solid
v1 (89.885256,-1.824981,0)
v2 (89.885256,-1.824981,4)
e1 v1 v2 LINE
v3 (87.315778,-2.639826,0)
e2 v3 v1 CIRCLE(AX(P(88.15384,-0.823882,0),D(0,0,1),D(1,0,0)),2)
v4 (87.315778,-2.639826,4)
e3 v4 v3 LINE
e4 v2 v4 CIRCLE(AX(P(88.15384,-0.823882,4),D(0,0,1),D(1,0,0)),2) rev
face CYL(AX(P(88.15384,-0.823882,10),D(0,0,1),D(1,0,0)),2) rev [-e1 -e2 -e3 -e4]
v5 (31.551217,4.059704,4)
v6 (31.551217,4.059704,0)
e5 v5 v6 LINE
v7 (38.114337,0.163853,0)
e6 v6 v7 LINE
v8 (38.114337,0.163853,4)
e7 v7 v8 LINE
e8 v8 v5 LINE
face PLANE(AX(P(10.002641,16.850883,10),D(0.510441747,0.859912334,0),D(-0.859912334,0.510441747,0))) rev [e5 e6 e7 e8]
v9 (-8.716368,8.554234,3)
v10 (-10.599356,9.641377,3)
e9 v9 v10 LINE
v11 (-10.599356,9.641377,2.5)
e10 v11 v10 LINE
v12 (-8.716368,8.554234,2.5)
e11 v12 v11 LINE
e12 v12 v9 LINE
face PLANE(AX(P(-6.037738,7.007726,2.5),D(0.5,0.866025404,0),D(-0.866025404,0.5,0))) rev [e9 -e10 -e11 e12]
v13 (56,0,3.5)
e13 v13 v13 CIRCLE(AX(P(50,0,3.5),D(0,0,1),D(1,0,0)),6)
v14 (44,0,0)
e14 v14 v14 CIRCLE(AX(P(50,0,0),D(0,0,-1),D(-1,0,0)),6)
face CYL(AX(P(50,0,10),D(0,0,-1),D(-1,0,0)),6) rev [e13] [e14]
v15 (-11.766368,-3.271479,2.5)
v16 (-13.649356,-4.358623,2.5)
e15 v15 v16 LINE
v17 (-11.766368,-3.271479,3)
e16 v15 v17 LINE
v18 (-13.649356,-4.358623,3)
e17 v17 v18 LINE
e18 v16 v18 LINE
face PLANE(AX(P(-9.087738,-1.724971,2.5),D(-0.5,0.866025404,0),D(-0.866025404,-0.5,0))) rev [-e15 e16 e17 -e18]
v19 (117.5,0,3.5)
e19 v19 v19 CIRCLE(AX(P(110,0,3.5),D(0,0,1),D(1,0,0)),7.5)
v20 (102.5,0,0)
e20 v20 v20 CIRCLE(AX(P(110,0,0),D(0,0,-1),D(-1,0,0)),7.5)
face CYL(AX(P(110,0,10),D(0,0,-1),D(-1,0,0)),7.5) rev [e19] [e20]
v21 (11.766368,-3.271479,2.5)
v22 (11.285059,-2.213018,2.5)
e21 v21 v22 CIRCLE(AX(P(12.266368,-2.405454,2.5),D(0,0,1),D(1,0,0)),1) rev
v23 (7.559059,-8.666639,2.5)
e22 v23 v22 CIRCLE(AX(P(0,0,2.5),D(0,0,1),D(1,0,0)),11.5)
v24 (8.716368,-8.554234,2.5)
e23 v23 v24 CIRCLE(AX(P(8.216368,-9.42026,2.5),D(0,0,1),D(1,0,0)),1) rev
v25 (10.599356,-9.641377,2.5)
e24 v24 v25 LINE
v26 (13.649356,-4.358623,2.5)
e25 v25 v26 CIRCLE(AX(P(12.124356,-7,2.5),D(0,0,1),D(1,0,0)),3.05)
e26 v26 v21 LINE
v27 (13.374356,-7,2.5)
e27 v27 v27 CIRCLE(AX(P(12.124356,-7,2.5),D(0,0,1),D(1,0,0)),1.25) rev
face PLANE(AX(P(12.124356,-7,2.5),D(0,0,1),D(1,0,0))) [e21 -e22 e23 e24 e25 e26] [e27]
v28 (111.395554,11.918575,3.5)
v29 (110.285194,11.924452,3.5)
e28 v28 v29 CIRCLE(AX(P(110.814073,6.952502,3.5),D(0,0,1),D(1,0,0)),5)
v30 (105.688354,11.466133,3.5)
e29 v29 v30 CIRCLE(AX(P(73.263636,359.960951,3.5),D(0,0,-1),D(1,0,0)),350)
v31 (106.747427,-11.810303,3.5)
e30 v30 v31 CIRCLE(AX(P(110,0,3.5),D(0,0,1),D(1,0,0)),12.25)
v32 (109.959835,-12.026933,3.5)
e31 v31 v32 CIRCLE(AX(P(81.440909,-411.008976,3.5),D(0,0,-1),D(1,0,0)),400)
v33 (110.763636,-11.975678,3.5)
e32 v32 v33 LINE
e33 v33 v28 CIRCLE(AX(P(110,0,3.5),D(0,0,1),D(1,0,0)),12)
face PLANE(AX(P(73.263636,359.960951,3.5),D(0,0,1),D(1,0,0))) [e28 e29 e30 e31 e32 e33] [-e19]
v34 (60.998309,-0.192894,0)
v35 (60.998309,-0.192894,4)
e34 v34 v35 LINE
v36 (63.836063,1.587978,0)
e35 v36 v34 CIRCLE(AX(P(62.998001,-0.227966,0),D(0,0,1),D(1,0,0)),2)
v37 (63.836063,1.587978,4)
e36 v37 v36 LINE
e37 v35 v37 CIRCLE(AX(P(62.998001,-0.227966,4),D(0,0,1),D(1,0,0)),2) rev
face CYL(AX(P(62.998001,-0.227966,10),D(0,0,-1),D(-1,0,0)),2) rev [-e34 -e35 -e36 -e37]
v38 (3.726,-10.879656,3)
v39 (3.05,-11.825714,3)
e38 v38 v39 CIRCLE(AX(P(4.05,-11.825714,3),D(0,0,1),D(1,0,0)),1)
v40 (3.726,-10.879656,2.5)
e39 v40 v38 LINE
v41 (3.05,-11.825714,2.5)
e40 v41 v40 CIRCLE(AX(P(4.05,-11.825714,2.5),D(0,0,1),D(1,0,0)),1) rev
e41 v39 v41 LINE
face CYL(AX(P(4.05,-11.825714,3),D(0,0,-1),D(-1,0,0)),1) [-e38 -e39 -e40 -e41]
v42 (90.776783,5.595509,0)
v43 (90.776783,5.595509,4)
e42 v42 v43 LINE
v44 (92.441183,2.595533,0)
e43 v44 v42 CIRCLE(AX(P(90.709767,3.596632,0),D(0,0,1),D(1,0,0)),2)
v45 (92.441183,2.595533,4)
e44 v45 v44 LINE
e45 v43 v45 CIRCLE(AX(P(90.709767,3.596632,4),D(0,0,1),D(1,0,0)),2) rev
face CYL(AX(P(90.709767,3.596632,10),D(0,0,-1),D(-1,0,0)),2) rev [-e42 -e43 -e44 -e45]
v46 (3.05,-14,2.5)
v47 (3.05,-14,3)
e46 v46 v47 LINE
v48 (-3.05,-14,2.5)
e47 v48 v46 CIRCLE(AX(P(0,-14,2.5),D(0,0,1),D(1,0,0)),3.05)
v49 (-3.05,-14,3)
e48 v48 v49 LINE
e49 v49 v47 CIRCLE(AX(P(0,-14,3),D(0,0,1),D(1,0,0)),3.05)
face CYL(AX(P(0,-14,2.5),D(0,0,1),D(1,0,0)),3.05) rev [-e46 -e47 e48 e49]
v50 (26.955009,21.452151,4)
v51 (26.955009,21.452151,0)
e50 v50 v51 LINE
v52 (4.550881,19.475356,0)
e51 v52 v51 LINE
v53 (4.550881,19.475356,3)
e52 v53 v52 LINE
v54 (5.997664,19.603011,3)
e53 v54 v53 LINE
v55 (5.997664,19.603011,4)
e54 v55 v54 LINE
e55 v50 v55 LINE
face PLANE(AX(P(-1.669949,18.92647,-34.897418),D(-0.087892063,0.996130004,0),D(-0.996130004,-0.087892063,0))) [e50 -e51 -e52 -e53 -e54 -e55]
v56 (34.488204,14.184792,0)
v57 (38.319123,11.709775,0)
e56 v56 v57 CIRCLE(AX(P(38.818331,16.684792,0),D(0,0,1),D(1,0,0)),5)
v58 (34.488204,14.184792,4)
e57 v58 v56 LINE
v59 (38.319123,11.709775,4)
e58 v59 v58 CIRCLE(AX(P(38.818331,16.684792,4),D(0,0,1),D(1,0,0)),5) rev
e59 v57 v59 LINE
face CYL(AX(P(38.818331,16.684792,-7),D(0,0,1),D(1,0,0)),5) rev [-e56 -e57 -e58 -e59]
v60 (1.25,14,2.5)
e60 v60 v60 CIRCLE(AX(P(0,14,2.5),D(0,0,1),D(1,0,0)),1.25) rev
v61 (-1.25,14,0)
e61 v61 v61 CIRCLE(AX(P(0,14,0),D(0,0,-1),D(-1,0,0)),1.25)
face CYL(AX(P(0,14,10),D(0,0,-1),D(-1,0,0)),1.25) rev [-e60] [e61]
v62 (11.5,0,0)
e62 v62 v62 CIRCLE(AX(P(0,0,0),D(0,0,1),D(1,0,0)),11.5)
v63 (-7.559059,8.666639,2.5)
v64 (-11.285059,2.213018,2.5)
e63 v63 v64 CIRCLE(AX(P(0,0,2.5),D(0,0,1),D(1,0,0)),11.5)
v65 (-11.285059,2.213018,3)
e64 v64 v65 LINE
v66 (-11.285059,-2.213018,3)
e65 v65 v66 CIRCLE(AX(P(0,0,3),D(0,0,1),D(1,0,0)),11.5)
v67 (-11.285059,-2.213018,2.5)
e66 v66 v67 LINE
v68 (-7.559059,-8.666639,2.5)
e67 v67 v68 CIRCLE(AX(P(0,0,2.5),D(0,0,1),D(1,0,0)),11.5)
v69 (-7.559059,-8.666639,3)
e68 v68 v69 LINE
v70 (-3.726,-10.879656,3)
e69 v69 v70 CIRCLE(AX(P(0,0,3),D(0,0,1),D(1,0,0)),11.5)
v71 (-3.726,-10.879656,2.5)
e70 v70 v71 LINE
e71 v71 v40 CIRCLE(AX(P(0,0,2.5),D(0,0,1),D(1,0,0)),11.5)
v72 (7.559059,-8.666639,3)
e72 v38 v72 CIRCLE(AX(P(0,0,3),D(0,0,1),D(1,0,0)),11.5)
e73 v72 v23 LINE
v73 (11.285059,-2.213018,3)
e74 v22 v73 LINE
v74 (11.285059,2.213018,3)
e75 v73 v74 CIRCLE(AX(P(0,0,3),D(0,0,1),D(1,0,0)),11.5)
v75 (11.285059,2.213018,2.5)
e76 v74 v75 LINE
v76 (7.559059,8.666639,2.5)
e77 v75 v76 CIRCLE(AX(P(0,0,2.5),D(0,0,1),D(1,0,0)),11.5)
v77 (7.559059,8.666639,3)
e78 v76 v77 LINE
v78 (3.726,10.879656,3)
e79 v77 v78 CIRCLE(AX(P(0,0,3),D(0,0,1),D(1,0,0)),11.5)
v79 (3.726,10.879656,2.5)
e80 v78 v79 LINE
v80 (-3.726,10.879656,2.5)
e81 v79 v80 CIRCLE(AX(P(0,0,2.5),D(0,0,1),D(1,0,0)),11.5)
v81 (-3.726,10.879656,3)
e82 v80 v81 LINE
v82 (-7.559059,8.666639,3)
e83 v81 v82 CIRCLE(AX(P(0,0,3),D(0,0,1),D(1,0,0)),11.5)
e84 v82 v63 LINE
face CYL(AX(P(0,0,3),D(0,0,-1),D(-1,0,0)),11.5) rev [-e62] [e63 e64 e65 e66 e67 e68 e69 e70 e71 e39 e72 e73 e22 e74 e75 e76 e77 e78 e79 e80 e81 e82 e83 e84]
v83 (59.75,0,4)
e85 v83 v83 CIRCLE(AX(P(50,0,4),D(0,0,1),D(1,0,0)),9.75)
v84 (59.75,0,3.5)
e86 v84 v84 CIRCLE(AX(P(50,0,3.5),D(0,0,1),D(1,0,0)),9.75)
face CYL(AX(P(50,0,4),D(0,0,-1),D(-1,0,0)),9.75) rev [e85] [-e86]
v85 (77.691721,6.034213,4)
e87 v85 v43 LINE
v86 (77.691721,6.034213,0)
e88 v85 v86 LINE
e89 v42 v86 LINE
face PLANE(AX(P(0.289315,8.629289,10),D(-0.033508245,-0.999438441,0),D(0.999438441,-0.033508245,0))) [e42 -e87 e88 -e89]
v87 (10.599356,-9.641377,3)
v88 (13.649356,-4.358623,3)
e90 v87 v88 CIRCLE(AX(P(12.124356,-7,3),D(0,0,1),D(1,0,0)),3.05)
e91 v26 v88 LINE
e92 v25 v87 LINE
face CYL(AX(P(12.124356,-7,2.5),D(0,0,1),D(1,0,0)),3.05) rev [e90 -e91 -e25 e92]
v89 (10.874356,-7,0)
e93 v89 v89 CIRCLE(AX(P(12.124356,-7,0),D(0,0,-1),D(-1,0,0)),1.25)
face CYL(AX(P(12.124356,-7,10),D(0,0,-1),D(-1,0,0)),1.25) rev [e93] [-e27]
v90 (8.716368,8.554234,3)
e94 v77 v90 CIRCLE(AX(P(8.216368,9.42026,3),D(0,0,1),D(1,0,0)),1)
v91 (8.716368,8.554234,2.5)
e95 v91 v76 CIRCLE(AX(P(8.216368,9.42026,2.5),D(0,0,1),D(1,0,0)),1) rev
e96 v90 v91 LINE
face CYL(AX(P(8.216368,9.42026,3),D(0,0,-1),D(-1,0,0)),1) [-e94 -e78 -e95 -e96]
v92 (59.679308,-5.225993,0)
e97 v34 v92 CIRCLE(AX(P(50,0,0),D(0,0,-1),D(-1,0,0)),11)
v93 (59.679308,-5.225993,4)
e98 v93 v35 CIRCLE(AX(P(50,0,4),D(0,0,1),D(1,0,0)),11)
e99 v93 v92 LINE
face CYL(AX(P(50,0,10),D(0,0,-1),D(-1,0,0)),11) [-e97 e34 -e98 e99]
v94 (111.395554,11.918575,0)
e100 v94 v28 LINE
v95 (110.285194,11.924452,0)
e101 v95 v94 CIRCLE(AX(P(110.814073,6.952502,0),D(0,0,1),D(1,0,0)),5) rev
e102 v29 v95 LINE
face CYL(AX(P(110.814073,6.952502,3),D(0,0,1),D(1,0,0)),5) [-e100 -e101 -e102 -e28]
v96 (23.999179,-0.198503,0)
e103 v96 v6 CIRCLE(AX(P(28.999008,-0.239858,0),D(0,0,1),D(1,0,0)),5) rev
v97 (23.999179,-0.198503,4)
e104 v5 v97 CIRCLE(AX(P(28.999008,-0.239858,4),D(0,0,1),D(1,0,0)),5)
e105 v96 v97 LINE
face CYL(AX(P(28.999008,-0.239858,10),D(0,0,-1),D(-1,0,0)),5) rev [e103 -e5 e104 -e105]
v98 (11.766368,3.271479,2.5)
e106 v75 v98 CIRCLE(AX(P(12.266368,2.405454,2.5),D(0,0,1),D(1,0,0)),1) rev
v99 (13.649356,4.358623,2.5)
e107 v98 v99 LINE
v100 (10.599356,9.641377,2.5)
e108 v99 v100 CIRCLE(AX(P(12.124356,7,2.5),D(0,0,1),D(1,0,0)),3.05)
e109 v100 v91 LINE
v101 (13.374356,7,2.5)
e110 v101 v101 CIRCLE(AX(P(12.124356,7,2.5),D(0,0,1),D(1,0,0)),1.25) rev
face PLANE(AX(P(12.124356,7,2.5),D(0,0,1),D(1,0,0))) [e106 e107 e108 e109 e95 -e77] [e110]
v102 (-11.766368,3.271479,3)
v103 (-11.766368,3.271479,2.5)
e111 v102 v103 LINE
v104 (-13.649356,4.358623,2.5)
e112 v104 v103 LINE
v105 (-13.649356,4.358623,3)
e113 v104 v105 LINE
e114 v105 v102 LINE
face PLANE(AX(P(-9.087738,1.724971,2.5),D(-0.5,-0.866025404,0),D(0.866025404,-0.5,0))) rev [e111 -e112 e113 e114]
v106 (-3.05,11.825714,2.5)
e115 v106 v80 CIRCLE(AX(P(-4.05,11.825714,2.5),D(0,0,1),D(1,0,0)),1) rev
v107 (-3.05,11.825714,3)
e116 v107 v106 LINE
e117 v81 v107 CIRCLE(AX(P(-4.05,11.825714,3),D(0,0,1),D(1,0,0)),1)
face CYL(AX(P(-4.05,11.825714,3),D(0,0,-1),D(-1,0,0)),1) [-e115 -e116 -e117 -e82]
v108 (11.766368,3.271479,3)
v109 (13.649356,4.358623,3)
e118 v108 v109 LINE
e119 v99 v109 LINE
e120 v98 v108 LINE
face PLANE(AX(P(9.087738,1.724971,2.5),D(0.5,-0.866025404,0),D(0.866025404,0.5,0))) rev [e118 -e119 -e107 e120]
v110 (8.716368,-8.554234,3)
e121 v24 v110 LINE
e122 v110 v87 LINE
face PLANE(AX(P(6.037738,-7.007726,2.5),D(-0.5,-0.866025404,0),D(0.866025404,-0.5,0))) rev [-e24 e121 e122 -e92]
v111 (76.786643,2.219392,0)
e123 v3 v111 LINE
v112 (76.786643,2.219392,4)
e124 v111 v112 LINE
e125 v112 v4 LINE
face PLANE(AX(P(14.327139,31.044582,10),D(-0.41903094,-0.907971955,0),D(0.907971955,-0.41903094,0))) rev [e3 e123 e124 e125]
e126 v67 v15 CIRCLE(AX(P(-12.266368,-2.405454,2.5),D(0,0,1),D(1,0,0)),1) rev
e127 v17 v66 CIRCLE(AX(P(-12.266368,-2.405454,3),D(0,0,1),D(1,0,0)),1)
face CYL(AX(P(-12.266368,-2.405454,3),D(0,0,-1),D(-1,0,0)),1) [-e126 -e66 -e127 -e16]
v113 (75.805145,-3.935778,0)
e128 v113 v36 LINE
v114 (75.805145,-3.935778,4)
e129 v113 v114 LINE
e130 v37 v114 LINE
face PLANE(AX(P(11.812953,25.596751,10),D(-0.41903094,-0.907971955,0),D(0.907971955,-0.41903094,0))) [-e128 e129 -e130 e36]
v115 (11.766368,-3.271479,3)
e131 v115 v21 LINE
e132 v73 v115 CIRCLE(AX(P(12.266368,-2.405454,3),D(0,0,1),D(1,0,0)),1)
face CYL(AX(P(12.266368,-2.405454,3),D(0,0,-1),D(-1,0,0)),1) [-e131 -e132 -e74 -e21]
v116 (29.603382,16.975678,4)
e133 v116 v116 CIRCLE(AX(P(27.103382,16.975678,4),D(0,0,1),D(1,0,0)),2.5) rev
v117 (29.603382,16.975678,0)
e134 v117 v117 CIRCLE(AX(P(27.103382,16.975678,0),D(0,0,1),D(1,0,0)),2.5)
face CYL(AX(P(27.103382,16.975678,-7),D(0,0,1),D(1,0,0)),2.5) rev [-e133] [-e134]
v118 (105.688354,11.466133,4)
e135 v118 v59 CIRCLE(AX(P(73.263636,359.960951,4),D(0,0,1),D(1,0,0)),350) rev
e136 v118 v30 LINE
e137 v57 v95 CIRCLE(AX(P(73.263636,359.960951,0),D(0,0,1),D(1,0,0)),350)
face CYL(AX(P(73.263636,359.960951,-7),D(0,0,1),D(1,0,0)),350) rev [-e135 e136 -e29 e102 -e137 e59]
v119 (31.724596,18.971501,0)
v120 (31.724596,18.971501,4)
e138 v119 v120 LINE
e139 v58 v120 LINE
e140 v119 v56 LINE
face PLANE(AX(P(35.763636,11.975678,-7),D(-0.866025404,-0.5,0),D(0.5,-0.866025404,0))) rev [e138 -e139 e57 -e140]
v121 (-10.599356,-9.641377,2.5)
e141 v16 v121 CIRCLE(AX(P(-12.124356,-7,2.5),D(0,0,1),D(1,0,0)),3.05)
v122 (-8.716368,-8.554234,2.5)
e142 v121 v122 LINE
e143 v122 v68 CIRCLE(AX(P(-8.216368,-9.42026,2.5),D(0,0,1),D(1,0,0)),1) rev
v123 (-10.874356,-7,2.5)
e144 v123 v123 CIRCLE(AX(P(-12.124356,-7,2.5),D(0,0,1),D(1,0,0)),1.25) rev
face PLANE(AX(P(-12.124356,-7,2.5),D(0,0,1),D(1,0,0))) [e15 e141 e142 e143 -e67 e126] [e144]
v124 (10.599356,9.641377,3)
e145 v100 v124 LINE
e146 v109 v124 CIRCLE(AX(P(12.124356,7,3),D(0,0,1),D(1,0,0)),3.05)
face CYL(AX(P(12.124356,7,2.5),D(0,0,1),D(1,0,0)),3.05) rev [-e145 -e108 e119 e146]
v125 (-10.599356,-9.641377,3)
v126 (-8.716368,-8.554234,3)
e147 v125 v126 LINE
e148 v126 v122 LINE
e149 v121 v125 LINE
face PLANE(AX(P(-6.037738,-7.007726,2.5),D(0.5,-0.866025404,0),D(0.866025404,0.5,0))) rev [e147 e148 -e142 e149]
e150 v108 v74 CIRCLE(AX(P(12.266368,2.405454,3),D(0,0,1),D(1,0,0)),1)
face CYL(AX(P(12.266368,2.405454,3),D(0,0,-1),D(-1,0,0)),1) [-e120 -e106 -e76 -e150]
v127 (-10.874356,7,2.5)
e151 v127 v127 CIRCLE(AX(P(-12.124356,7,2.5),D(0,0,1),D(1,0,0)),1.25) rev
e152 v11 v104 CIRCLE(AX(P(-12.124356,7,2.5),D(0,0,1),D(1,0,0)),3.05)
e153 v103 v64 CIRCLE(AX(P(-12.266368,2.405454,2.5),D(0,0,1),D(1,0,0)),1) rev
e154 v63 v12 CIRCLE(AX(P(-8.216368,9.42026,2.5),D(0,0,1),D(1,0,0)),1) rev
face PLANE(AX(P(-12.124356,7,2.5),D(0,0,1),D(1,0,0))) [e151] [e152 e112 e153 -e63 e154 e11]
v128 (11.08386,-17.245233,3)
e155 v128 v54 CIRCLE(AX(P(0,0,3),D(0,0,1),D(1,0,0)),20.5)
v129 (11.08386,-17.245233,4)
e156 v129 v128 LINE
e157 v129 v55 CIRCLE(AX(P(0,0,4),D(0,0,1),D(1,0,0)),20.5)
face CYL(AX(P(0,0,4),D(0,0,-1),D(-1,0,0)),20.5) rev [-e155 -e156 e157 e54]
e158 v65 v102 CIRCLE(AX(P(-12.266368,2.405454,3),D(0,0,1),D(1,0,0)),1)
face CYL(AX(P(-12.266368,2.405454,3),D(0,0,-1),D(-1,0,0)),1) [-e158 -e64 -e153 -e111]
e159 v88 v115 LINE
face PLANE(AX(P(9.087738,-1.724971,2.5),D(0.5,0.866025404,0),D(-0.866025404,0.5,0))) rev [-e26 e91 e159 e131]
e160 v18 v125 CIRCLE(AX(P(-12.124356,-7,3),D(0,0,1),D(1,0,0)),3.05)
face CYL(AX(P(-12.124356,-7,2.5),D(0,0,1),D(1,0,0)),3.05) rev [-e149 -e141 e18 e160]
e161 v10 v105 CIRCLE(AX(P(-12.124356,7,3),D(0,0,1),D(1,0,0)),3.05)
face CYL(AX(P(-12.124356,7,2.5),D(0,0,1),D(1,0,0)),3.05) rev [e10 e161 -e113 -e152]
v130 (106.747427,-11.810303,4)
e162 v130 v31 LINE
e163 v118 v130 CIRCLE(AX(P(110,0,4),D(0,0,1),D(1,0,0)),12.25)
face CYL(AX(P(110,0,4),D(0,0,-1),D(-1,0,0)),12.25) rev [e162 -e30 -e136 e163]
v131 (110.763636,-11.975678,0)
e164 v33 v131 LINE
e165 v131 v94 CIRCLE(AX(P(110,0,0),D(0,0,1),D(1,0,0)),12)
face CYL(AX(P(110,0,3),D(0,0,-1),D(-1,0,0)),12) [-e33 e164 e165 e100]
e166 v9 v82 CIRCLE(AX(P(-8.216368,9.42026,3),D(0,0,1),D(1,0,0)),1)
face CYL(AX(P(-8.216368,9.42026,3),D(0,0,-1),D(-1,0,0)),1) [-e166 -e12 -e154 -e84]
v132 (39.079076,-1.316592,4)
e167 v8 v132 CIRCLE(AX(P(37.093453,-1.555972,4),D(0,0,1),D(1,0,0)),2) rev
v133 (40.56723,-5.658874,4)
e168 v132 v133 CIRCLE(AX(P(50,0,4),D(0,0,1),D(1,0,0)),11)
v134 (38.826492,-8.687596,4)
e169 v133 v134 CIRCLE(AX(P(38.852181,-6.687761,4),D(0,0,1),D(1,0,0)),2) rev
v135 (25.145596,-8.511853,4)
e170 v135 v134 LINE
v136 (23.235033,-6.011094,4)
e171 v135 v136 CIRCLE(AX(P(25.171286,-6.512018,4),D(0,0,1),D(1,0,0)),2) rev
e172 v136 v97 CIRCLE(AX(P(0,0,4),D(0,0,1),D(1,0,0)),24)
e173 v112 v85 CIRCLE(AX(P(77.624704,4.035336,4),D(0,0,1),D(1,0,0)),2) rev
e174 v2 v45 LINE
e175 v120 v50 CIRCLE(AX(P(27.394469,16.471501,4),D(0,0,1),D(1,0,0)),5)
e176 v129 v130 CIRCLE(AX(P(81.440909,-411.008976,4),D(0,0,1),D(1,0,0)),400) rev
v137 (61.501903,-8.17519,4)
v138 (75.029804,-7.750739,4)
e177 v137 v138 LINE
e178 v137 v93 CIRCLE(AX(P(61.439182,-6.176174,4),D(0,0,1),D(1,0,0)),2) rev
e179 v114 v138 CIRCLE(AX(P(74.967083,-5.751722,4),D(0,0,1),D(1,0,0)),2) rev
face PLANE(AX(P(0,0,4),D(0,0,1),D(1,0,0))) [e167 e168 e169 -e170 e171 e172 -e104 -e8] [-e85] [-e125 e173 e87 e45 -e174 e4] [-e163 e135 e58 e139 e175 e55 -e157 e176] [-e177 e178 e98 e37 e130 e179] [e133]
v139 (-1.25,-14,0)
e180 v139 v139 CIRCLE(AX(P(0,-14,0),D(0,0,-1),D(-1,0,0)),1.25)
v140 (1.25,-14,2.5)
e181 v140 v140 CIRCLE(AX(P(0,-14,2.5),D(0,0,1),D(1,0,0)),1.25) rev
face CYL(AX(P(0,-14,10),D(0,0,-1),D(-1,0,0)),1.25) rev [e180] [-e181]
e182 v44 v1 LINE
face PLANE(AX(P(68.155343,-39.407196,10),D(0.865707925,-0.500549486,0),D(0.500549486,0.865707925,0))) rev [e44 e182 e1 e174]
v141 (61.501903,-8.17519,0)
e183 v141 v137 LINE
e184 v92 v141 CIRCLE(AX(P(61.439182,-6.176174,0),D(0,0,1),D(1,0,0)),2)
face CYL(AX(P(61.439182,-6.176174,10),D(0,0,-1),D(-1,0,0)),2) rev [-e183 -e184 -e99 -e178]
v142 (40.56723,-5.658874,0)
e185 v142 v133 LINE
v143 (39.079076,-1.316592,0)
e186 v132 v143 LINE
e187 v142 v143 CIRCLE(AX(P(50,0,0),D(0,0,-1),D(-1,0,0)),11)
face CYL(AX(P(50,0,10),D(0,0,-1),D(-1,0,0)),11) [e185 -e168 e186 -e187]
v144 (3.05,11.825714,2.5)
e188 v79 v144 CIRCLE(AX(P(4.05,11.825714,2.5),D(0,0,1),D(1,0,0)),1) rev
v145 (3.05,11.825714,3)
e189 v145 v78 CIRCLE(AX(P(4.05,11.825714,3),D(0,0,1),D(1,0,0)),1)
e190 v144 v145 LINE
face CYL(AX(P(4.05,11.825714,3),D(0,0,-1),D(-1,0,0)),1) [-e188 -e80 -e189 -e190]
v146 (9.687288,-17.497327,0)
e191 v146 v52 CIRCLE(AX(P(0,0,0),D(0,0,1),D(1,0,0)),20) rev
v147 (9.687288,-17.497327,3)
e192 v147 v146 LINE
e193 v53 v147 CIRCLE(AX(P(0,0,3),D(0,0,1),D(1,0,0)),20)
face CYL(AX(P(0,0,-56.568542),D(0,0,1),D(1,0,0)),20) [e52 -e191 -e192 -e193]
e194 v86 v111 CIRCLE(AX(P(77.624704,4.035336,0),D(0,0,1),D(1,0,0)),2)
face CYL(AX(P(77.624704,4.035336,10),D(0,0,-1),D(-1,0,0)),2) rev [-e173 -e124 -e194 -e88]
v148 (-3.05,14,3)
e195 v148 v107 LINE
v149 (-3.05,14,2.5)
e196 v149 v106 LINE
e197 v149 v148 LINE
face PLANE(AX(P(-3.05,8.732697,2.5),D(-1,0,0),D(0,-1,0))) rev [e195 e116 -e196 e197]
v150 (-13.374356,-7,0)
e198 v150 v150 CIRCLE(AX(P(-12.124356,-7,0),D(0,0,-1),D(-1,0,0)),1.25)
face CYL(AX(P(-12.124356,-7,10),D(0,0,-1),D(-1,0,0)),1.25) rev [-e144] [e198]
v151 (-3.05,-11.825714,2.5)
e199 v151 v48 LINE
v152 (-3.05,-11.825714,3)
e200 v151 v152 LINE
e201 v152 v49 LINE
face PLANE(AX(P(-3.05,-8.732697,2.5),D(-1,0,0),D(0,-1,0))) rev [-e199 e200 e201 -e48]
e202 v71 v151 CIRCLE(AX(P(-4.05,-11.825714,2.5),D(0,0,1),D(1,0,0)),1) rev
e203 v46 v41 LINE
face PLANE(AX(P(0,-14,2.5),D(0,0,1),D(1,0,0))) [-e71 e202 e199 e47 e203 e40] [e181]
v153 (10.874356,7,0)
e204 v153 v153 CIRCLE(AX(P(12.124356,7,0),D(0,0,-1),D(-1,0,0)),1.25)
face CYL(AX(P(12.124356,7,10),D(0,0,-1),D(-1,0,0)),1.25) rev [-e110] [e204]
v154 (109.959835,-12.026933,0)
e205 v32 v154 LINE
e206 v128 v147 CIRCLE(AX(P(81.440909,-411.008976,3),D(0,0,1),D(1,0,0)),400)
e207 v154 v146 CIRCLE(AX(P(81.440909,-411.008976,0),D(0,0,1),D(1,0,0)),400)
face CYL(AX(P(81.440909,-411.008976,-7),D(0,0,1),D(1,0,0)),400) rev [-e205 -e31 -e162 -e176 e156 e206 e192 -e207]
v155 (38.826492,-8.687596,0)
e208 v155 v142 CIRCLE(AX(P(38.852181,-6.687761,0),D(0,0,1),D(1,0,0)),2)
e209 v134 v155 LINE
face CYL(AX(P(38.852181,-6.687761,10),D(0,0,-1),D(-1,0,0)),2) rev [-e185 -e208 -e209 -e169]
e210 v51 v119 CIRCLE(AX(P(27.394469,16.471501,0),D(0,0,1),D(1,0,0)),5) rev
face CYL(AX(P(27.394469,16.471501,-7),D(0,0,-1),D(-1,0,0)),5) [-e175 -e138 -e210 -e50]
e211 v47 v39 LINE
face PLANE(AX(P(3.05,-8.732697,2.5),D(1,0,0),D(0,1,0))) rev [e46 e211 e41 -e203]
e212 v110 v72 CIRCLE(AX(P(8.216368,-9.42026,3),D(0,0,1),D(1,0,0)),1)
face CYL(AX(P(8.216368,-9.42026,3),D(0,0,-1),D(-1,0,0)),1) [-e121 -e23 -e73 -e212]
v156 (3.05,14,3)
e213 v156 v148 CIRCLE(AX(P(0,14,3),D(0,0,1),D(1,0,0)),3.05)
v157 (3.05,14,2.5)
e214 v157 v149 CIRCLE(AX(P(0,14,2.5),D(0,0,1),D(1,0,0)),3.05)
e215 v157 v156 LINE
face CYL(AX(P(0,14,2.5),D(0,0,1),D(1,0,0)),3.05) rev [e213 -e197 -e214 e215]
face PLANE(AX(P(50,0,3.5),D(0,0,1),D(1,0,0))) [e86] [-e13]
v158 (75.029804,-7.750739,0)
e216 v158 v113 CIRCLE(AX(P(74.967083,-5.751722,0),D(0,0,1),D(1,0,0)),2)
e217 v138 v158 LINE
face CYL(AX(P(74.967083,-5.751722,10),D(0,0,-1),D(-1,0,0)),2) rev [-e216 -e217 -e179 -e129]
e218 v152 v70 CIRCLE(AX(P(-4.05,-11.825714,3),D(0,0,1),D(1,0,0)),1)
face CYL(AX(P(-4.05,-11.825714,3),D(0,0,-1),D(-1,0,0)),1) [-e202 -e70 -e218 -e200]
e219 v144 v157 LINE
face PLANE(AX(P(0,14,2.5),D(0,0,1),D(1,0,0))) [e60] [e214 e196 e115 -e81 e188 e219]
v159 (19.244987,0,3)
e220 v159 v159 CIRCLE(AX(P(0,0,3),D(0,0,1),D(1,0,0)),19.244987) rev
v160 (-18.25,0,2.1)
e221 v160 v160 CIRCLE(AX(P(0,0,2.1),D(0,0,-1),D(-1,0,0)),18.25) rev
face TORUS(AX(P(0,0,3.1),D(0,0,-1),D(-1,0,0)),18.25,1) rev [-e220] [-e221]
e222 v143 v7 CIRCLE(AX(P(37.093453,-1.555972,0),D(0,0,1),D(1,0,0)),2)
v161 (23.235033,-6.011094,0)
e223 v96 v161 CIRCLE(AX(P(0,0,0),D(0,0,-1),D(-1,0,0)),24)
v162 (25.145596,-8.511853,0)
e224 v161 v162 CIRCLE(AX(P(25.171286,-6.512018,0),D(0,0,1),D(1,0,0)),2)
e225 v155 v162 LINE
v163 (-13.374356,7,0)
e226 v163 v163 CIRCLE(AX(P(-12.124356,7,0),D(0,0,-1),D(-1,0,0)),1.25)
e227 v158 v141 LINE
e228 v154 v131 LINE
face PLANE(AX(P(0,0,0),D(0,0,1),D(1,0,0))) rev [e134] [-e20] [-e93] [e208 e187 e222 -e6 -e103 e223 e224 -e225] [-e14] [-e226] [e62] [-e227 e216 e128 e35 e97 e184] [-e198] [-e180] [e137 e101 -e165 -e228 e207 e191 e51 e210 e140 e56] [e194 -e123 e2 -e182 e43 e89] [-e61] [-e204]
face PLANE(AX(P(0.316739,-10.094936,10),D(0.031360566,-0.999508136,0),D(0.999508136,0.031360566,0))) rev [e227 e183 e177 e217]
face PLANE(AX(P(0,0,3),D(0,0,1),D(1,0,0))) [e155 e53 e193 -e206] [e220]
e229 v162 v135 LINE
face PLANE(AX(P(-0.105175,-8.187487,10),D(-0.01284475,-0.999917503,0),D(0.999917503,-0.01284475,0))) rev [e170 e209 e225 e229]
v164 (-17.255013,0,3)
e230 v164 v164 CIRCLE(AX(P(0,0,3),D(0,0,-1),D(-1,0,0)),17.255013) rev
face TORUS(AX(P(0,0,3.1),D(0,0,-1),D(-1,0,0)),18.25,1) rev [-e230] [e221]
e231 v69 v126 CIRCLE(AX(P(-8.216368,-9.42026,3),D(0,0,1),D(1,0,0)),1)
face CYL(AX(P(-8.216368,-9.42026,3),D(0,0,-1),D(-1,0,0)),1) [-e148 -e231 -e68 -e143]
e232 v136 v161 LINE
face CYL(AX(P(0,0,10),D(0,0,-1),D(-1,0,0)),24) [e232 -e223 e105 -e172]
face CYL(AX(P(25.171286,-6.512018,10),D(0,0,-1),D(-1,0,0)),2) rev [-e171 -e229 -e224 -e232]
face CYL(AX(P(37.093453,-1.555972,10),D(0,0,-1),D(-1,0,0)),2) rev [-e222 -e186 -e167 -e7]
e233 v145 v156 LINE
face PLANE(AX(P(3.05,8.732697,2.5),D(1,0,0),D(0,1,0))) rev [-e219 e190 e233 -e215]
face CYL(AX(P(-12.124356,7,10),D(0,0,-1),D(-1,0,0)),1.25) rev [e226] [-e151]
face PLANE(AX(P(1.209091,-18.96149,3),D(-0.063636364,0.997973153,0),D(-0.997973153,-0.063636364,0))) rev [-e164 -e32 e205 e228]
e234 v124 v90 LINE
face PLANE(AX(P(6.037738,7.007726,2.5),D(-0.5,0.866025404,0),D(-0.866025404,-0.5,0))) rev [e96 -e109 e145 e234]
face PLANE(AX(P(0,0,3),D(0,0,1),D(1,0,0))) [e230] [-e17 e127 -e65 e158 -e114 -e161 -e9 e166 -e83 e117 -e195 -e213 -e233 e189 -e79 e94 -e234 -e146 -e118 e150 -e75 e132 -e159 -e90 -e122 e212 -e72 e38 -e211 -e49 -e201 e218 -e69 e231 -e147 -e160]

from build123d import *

# Parameters (mm, degrees)
SKETCH_1_R           = 11.5
EXTRUDE_1_DEPTH      = 3
SKETCH_2_R           = 6
CUT_EXTRUDE_1_DEPTH  = 10
SKETCH_3_R           = 7.5
CUT_EXTRUDE_2_DEPTH  = 10
SKETCH_5_R           = 1.25
CUT_EXTRUDE_4_DEPTH  = 10
SKETCH_9_W           = 9.785413343
SKETCH_9_H           = 10.582240284
EXTRUDE_4_DEPTH      = 3
EXTRUDE_6_DEPTH      = 3
SKETCH_13_R          = 400
CUT_EXTRUDE_6_DEPTH  = 10
EXTRUDE_7_DEPTH      = 3
SKETCH_15_R          = 2.5
CUT_EXTRUDE_7_DEPTH  = 10
EXTRUDE_START        = 1
SKETCH_19_R          = 9.75
SKETCH_19_R_2        = 2.5
EXTRUDE_8_DEPTH      = 1
FILLET_1_R           = 5
CUT_EXTRUDE_8_DEPTH  = 10
FILLET_2_R           = 2
FILLET_3_DEPTH       = 4
CUT_EXTRUDE_9_DEPTH  = 0.5
FILLET_5_R           = 1
SKETCH_21_R          = 20
SKETCH_21_R_2        = 17.05
EXTRUDE_9_DEPTH      = 3
EXTRUDE_START_2      = 0.1
SKETCH_23_R          = 20
SKETCH_23_R_2        = 17.05
EXTRUDE_10_DEPTH     = 0.1
SKETCH_22_R          = 19.25
SKETCH_22_R_2        = 17.25
CUT_EXTRUDE_14_DEPTH = 1
FILLET_7_R           = 1
SKETCH_24_R          = 20
CUT_EXTRUDE_15_DEPTH = 0.1
EXTRUDE_START_3      = 0.5
SKETCH_25_R          = 9.75
SKETCH_25_R_2        = 6
SKETCH_25_R_3        = 7.5
EXTRUDE_11_DEPTH     = 0.5


with BuildPart() as part:
    # 草图1 → 凸台-拉伸1 (new body)
    with BuildSketch(Plane.XY):
        with BuildLine():
            Line((1.209090909, 18.961489899), (110.763636364, 11.975677831))
            ThreePointArc((110.763636364, 11.975677831), (122, 0), (110.763636364, -11.975677831))
            Line((110.763636364, -11.975677831), (1.209090909, -18.961489899))
            ThreePointArc((1.209090909, -18.961489899), (-19, 0), (1.209090909, 18.961489899))
        make_face()
        Circle(SKETCH_1_R, mode=Mode.SUBTRACT)
    extrude(amount=EXTRUDE_1_DEPTH)

    # 草图2 → 切除-拉伸1 (cut)
    with BuildSketch(Plane(origin=(0, 0, 0), x_dir=(-1, 0, 0), z_dir=(0, 0, -1))):
        with Locations((-50, 0)):
            Circle(SKETCH_2_R)
    extrude(amount=-CUT_EXTRUDE_1_DEPTH, mode=Mode.SUBTRACT)

    # 草图3 → 切除-拉伸2 (cut)
    with BuildSketch(Plane(origin=(0, 0, 0), x_dir=(-1, 0, 0), z_dir=(0, 0, -1))):
        with Locations((-110, 0)):
            Circle(SKETCH_3_R)
    extrude(amount=-CUT_EXTRUDE_2_DEPTH, mode=Mode.SUBTRACT)

    # 草图5 → 切除-拉伸4 (cut)
    with BuildSketch(Plane(origin=(0, 0, 0), x_dir=(-1, 0, 0), z_dir=(0, 0, -1))):
        with Locations((0, 14)):
            Circle(SKETCH_5_R)
        with Locations((12.124355653, 7)):
            Circle(SKETCH_5_R)
        with Locations((12.124355653, -7)):
            Circle(SKETCH_5_R)
        with Locations((0, -14)):
            Circle(SKETCH_5_R)
        with Locations((-12.124355653, -7)):
            Circle(SKETCH_5_R)
        with Locations((-12.124355653, 7)):
            Circle(SKETCH_5_R)
    extrude(amount=-CUT_EXTRUDE_4_DEPTH, mode=Mode.SUBTRACT)

    # 草图9 → 凸台-拉伸4 (add, through all)
    with BuildSketch(Plane.XY.offset(3)):
        with Locations((26.618118247, 0)):
            Rectangle(SKETCH_9_W, SKETCH_9_H)
    extrude(amount=-EXTRUDE_4_DEPTH)

    # 草图12 → 凸台-拉伸6 (add)
    with BuildSketch(Plane.XY.offset(3)):
        Polygon((28.745410775, -6.403803536), (34.060824307, -16.874768539), (25.628100583, -16.874768539), (24.509066155, -9.241355121), align=None)
    extrude(amount=-EXTRUDE_6_DEPTH)

    # 草图13 → 切除-拉伸6 (cut)
    with BuildSketch(Plane.XY.offset(3)):
        with Locations((81.440909091, -411.008975968)):
            Circle(SKETCH_13_R)
        with BuildLine():
            Line((35.763636364, 11.975677831), (32.896967938, 16.940893192))
            Line((32.896967938, 16.940893192), (110.763636364, 11.975677831))
            ThreePointArc((110.763636364, 11.975677831), (73.263636364, 9.960950508), (35.763636364, 11.975677831))
        make_face()
    extrude(amount=-CUT_EXTRUDE_6_DEPTH, mode=Mode.SUBTRACT)

    # 草图16 → 凸台-拉伸7 (add)
    with BuildSketch(Plane.XY.offset(3)):
        Polygon((32.896967938, 16.940893192), (30.130621057, 21.732346541), (-1.669949201, 18.926470079), align=None)
    extrude(amount=-EXTRUDE_7_DEPTH)

    # 草图15 → 切除-拉伸7 (cut)
    with BuildSketch(Plane.XY.offset(3)):
        with Locations((27.103382326, 16.975677831)):
            Circle(SKETCH_15_R)
    extrude(amount=-CUT_EXTRUDE_7_DEPTH, mode=Mode.SUBTRACT)

    # 草图19 → 凸台-拉伸8 (add)
    with BuildSketch(Plane.XY.offset(3).offset(EXTRUDE_START)):
        with BuildLine():
            ThreePointArc((105.688354296, 11.466133233), (70.713238171, 9.970242818), (35.763636364, 11.975677831))
            Line((35.763636364, 11.975677831), (30.130621057, 21.732346541))
            Line((30.130621057, 21.732346541), (5.997664044, 19.603010637))
            ThreePointArc((5.997664044, 19.603010637), (20.307458553, 2.803056747), (11.083860146, -17.245232508))
            ThreePointArc((11.083860146, -17.245232508), (58.752317078, -11.652959621), (106.747426676, -11.810303416))
            ThreePointArc((106.747426676, -11.810303416), (97.762660496, -0.556796062), (105.688354296, 11.466133233))
        make_face()
        with Locations((50, 0)):
            Circle(SKETCH_19_R, mode=Mode.SUBTRACT)
        with Locations((27.103382326, 16.975677831)):
            Circle(SKETCH_19_R_2, mode=Mode.SUBTRACT)
    extrude(amount=-EXTRUDE_8_DEPTH)

    # 圆角1
    fillet_1_edges = [part.edges().sort_by_distance(p)[0] for p in [
        (35.763636364, 11.975677831, 2),
        (30.130621057, 21.732346541, 2),
        (110.763636364, 11.975677831, 1.5),
    ]]
    fillet(fillet_1_edges, radius=FILLET_1_R)

    # 草图4 → 切除-拉伸8 (cut)
    with BuildSketch(Plane(origin=(0, 0, 0), x_dir=(-1, 0, 0), z_dir=(0, 0, -1))):
        with BuildLine():
            Line((-22.718337944, 7.738030826), (-25.489112126, 7.658153323))
            Line((-25.489112126, 7.658153323), (-39.006073297, -0.365480019))
            ThreePointArc((-39.006073297, -0.365480019), (-40.223576833, -5.041978785), (-43.327845655, -8.745419166))
            Line((-43.327845655, -8.745419166), (-22.452972771, -8.477264519))
            ThreePointArc((-22.452972771, -8.477264519), (-23.996786842, -0.392710175), (-22.718337944, 7.738030826))
        make_face()
        with BuildLine():
            Line((-83.49595781, -7.485104525), (-57.207283211, -8.309937949))
            ThreePointArc((-57.207283211, -8.309937949), (-60.555711126, -3.094666805), (-60.553265828, 3.102995386))
            Line((-60.553265828, 3.102995386), (-83.49595781, -7.485104525))
        make_face()
        Polygon((-88.972134801, -3.404237943), (-67.80208643, 6.365783266), (-94.111121995, 5.483718321), align=None)
    extrude(amount=-CUT_EXTRUDE_8_DEPTH, mode=Mode.SUBTRACT)

    # 圆角2
    # the kernel refuses this fillet: 2 mm, written as the material it adds along each edge
    with BuildSketch(Plane(origin=(22.718337944, 7.738030826, 0), x_dir=(0.9995847151360328, -0.028816614416278277, 0), z_dir=(0, 0, 1))) as fillet_2_piece_1:
        with BuildLine():
            CenterArc((2.716749156, -2), FILLET_2_R, 90, 104.226121897)
            ThreePointArc((0.778082336, -2.491498686), (0.422937237, -1.235163774), (0, 0))
            Line((0, 0), (2.716749156, 0))
        make_face()
    extrude(amount=4)
    with BuildSketch(Plane(origin=(25.489112126, 7.658153323, 0), x_dir=(-0.9995847151360342, 0.028816614416228722, 0), z_dir=(0, 0, 1))) as fillet_2_piece_2:
        with BuildLine():
            CenterArc((FILLET_2_R * 0.259008280186, FILLET_2_R), FILLET_2_R, 240.958040197, 29.041959803)
            Line((-FILLET_2_R * 0.226441726119, FILLET_2_R * 0.12573557125), (0, 0))
            Line((0, 0), (FILLET_2_R * 0.259008280186, 0))
        make_face()
    extrude(amount=4)
    with BuildSketch(Plane(origin=(57.207283211, -8.309937949, 0), x_dir=(0.9995081364804766, 0.031360566151216684, 0), z_dir=(0, 0, 1))) as fillet_2_piece_3:
        with BuildLine():
            CenterArc((4.296733051, 2), FILLET_2_R, 149.837648672, 120.162351328)
            ThreePointArc((2.567522758, 3.004903858), (1.419830152, 1.386188751), (0, 0))
            Line((0, 0), (4.296733051, 0))
        make_face()
    extrude(amount=4)
    with BuildSketch(Plane(origin=(60.553265828, 3.102995386, 0), x_dir=(0.907971955307365, -0.4190309396396886, 0), z_dir=(0, 0, 1))) as fillet_2_piece_4:
        with BuildLine():
            CenterArc((3.615526985, -2), FILLET_2_R, 90, 113.768639436)
            ThreePointArc((1.785166166, -2.806088874), (0.999247071, -1.335187377), (0, 0))
            Line((0, 0), (3.615526985, 0))
        make_face()
    extrude(amount=4)
    with BuildSketch(Plane(origin=(83.49595781, -7.485104525, 0), x_dir=(-0.9079719553073375, 0.41903093963974836, 0), z_dir=(0, 0, 1))) as fillet_2_piece_5:
        with BuildLine():
            CenterArc((FILLET_2_R * 4.23516000471, FILLET_2_R), FILLET_2_R, 116.570544508, 153.429455492)
            Line((FILLET_2_R * 3.78786065654, FILLET_2_R * 1.89438430952), (0, 0))
            Line((0, 0), (FILLET_2_R * 4.23516000471, 0))
        make_face()
    extrude(amount=4)
    with BuildSketch(Plane(origin=(88.972134801, -3.404237943, 0), x_dir=(-0.9079719553073382, 0.41903093963974675, 0), z_dir=(0, 0, 1))) as fillet_2_piece_6:
        with BuildLine():
            CenterArc((FILLET_2_R * 0.912118784285, -FILLET_2_R), FILLET_2_R, 90, 84.737061388)
            Line((-FILLET_2_R * 0.0836654548784, -FILLET_2_R * 0.908273509635), (0, 0))
            Line((0, 0), (FILLET_2_R * 0.912118784285, 0))
        make_face()
    extrude(amount=4)
    with BuildSketch(Plane(origin=(94.111121995, 5.483718321, 0), x_dir=(-0.9994384410783521, 0.03350824517747174, 0), z_dir=(0, 0, 1))) as fillet_2_piece_7:
        with BuildLine():
            CenterArc((FILLET_2_R * 1.66810604239, FILLET_2_R), FILLET_2_R, 151.883880104, 118.116119896)
            Line((FILLET_2_R * 0.786111728241, FILLET_2_R * 1.47126004478), (0, 0))
            Line((0, 0), (FILLET_2_R * 1.66810604239, 0))
        make_face()
    extrude(amount=4)
    with BuildSketch(Plane(origin=(67.80208643, 6.365783266, 0), x_dir=(0.9079719553073374, -0.41903093963974836, 0), z_dir=(0, 0, 1))) as fillet_2_piece_8:
        with BuildLine():
            CenterArc((FILLET_2_R * 4.94759562481, FILLET_2_R), FILLET_2_R, 112.853181284, 157.146818716)
            Line((FILLET_2_R * 4.55922454262, FILLET_2_R * 1.92150306702), (0, 0))
            Line((0, 0), (FILLET_2_R * 4.94759562481, 0))
        make_face()
    extrude(amount=4)
    with BuildSketch(Plane(origin=(39.006073297, -0.365480019, 0), x_dir=(-0.8599123343159623, 0.5104417472065474, 0), z_dir=(0, 0, 1))) as fillet_2_piece_9:
        with BuildLine():
            CenterArc((1.037008755, 2), FILLET_2_R, 217.567480166, 52.432519834)
            ThreePointArc((-0.548262886, 0.780609241), (-0.265665753, 0.39625052), (0, 0))
            Line((0, 0), (1.037008755, 0))
        make_face()
    extrude(amount=4)
    with BuildSketch(Plane(origin=(22.452972771, -8.477264519, 0), x_dir=(0.9999175027948216, -0.01284475007806766, 0), z_dir=(0, 0, 1))) as fillet_2_piece_10:
        with BuildLine():
            CenterArc((2.692845423, 2), FILLET_2_R, 166.231102907, 103.768897093)
            ThreePointArc((0.750318174, 2.476012488), (0.408547652, 1.227888344), (0, 0))
            Line((0, 0), (2.692845423, 0))
        make_face()
    extrude(amount=4)
    with BuildSketch(Plane(origin=(43.327845655, -8.745419166, 0), x_dir=(-0.6666566833763927, 0.7453649217058637, 0), z_dir=(0, 0, 1))) as fillet_2_piece_11:
        with BuildLine():
            CenterArc((4.517437931, 1.964251261), FILLET_2_R, 137.454482312, 121.696210167)
            Line((3.043957146, 3.316602686), (0, 0))
            ThreePointArc((0, 0), (2.070492385, 0.196618063), (4.14098477, 0))
        make_face()
    extrude(amount=4)

    # 圆角3: read off the stored shape, not the designer's step
    # 圆角3 outline → 圆角3 (add)
    with BuildSketch(Plane.XY):
        with BuildLine():
            ThreePointArc((23.424300597, 5.225145123), (23.866306721, 2.529704233), (23.999179079, -0.198503227))
            ThreePointArc((23.999179079, -0.198503227), (26.543240849, 4.115507296), (31.55121679, 4.059703606))
            Line((31.55121679, 4.059703606), (25.934560956, 7.393736045))
            ThreePointArc((25.934560956, 7.393736045), (25.581112537, 7.559257609), (25.202247662, 7.652983694))
            ThreePointArc((25.202247662, 7.652983694), (23.762733827, 6.842234342), (23.424300597, 5.225145123))
        make_face()
    extrude(amount=FILLET_3_DEPTH)

    # 草图20 → 切除-拉伸9 (cut)
    with BuildSketch(Plane.XY.offset(3)):
        with BuildLine():
            Line((9.0877376, 1.724971107), (13.649355653, 4.358622518))
            ThreePointArc((13.649355653, 4.358622518), (14.765733135, 8.525), (10.599355653, 9.641377482))
            Line((10.599355653, 9.641377482), (6.0377376, 7.00772607))
            ThreePointArc((6.0377376, 7.00772607), (8.010734985, 4.625), (9.0877376, 1.724971107))
        make_face()
        with BuildLine():
            Line((6.0377376, -7.00772607), (10.599355653, -9.641377482))
            ThreePointArc((10.599355653, -9.641377482), (14.765733135, -8.525), (13.649355653, -4.358622518))
            Line((13.649355653, -4.358622518), (9.0877376, -1.724971107))
            ThreePointArc((9.0877376, -1.724971107), (8.010734985, -4.625), (6.0377376, -7.00772607))
        make_face()
        with BuildLine():
            Line((-3.05, -8.732697178), (-3.05, -14))
            ThreePointArc((-3.05, -14), (0, -17.05), (3.05, -14))
            Line((3.05, -14), (3.05, -8.732697178))
            ThreePointArc((3.05, -8.732697178), (0, -9.25), (-3.05, -8.732697178))
        make_face()
        with BuildLine():
            Line((-9.0877376, -1.724971107), (-13.649355653, -4.358622518))
            ThreePointArc((-13.649355653, -4.358622518), (-14.765733135, -8.525), (-10.599355653, -9.641377482))
            Line((-10.599355653, -9.641377482), (-6.0377376, -7.00772607))
            ThreePointArc((-6.0377376, -7.00772607), (-8.010734985, -4.625), (-9.0877376, -1.724971107))
        make_face()
        with BuildLine():
            Line((-6.0377376, 7.00772607), (-10.599355653, 9.641377482))
            ThreePointArc((-10.599355653, 9.641377482), (-14.765733135, 8.525), (-13.649355653, 4.358622518))
            Line((-13.649355653, 4.358622518), (-9.0877376, 1.724971107))
            ThreePointArc((-9.0877376, 1.724971107), (-8.010734985, 4.625), (-6.0377376, 7.00772607))
        make_face()
        with BuildLine():
            Line((3.05, 8.732697178), (3.05, 14))
            ThreePointArc((3.05, 14), (0, 17.05), (-3.05, 14))
            Line((-3.05, 14), (-3.05, 8.732697178))
            ThreePointArc((-3.05, 8.732697178), (0, 9.25), (3.05, 8.732697178))
        make_face()
    extrude(amount=-CUT_EXTRUDE_9_DEPTH, mode=Mode.SUBTRACT)

    # 圆角5
    fillet_5_edges = [part.edges().sort_by_distance(p)[0] for p in [
        (8.077636357, 8.185462167, 2.75),
        (11.127636357, 2.902707204, 2.75),
        (-3.05, 11.088169371, 2.75),
        (3.05, 11.088169371, 2.75),
        (-11.127636357, 2.902707204, 2.75),
        (-8.077636357, 8.185462167, 2.75),
        (-8.077636357, -8.185462167, 2.75),
        (-11.127636357, -2.902707204, 2.75),
        (3.05, -11.088169371, 2.75),
        (-3.05, -11.088169371, 2.75),
        (11.127636357, -2.902707204, 2.75),
        (8.077636357, -8.185462167, 2.75),
    ]]
    fillet(fillet_5_edges, radius=FILLET_5_R)

    # 草图21 → 凸台-拉伸9 (add)
    with BuildSketch(Plane.XY.offset(3)):
        Circle(SKETCH_21_R)
        Circle(SKETCH_21_R_2, mode=Mode.SUBTRACT)
    extrude(amount=-EXTRUDE_9_DEPTH)

    # 草图23 → 凸台-拉伸10 (add)
    with BuildSketch(Plane.XY.offset(3).offset(EXTRUDE_START_2)):
        Circle(SKETCH_23_R)
        with Locations(Location((0, 0, 0), (0, 0, 150))):
            Circle(SKETCH_23_R_2, mode=Mode.SUBTRACT)
    extrude(amount=-EXTRUDE_10_DEPTH)

    # 草图22 → 切除-拉伸14 (cut)
    with BuildSketch(Plane(origin=(0, 0, 3.1), x_dir=(-1, 0, 0), z_dir=(0, 0, -1))):
        Circle(SKETCH_22_R)
        Circle(SKETCH_22_R_2, mode=Mode.SUBTRACT)
    extrude(amount=CUT_EXTRUDE_14_DEPTH, mode=Mode.SUBTRACT)

    # 圆角7
    fillet_7_edges = [part.edges().sort_by_distance(p)[0] for p in [
        (19.25, 0, 2.1),
        (17.25, 0, 2.1),
    ]]
    fillet(fillet_7_edges, radius=FILLET_7_R - 0.0001)  # a hair under: the kernel refuses the full size

    # 草图24 → 切除-拉伸15 (cut)
    with BuildSketch(Plane.XY.offset(3.1)):
        Circle(SKETCH_24_R)
    extrude(amount=-CUT_EXTRUDE_15_DEPTH, mode=Mode.SUBTRACT)

    # 草图25 → 凸台-拉伸11 (add)
    # profile 1 of 2: a face of its own
    with BuildSketch(Plane.XY.offset(3).offset(EXTRUDE_START_3)):
        with Locations((50, 0)):
            Circle(SKETCH_25_R)
        with Locations(Location((50, 0, 0), (0, 0, 180))):
            Circle(SKETCH_25_R_2, mode=Mode.SUBTRACT)
    # profile 2 of 2: a face of its own
    with BuildSketch(Plane.XY.offset(3).offset(EXTRUDE_START_3)):
        with BuildLine():
            Line((109.959835226, -12.026932698), (110.763636364, -11.975677831))
            ThreePointArc((110.763636364, -11.975677831), (121.995805716, -0.317246321), (111.395554215, 11.918574933))
            ThreePointArc((111.395554215, 11.918574933), (110.840537707, 11.952432007), (110.285193899, 11.924452023))
            ThreePointArc((110.285193899, 11.924452023), (107.987530271, 11.687708366), (105.688354296, 11.466133233))
            ThreePointArc((105.688354296, 11.466133233), (97.762660496, -0.556796062), (106.747426676, -11.810303416))
            ThreePointArc((106.747426676, -11.810303416), (108.353848915, -11.915385854), (109.959835226, -12.026932698))
        make_face()
        with Locations(Location((110, 0, 0), (0, 0, 180))):
            Circle(SKETCH_25_R_3, mode=Mode.SUBTRACT)
    extrude(amount=-EXTRUDE_11_DEPTH)


solid = part.part
